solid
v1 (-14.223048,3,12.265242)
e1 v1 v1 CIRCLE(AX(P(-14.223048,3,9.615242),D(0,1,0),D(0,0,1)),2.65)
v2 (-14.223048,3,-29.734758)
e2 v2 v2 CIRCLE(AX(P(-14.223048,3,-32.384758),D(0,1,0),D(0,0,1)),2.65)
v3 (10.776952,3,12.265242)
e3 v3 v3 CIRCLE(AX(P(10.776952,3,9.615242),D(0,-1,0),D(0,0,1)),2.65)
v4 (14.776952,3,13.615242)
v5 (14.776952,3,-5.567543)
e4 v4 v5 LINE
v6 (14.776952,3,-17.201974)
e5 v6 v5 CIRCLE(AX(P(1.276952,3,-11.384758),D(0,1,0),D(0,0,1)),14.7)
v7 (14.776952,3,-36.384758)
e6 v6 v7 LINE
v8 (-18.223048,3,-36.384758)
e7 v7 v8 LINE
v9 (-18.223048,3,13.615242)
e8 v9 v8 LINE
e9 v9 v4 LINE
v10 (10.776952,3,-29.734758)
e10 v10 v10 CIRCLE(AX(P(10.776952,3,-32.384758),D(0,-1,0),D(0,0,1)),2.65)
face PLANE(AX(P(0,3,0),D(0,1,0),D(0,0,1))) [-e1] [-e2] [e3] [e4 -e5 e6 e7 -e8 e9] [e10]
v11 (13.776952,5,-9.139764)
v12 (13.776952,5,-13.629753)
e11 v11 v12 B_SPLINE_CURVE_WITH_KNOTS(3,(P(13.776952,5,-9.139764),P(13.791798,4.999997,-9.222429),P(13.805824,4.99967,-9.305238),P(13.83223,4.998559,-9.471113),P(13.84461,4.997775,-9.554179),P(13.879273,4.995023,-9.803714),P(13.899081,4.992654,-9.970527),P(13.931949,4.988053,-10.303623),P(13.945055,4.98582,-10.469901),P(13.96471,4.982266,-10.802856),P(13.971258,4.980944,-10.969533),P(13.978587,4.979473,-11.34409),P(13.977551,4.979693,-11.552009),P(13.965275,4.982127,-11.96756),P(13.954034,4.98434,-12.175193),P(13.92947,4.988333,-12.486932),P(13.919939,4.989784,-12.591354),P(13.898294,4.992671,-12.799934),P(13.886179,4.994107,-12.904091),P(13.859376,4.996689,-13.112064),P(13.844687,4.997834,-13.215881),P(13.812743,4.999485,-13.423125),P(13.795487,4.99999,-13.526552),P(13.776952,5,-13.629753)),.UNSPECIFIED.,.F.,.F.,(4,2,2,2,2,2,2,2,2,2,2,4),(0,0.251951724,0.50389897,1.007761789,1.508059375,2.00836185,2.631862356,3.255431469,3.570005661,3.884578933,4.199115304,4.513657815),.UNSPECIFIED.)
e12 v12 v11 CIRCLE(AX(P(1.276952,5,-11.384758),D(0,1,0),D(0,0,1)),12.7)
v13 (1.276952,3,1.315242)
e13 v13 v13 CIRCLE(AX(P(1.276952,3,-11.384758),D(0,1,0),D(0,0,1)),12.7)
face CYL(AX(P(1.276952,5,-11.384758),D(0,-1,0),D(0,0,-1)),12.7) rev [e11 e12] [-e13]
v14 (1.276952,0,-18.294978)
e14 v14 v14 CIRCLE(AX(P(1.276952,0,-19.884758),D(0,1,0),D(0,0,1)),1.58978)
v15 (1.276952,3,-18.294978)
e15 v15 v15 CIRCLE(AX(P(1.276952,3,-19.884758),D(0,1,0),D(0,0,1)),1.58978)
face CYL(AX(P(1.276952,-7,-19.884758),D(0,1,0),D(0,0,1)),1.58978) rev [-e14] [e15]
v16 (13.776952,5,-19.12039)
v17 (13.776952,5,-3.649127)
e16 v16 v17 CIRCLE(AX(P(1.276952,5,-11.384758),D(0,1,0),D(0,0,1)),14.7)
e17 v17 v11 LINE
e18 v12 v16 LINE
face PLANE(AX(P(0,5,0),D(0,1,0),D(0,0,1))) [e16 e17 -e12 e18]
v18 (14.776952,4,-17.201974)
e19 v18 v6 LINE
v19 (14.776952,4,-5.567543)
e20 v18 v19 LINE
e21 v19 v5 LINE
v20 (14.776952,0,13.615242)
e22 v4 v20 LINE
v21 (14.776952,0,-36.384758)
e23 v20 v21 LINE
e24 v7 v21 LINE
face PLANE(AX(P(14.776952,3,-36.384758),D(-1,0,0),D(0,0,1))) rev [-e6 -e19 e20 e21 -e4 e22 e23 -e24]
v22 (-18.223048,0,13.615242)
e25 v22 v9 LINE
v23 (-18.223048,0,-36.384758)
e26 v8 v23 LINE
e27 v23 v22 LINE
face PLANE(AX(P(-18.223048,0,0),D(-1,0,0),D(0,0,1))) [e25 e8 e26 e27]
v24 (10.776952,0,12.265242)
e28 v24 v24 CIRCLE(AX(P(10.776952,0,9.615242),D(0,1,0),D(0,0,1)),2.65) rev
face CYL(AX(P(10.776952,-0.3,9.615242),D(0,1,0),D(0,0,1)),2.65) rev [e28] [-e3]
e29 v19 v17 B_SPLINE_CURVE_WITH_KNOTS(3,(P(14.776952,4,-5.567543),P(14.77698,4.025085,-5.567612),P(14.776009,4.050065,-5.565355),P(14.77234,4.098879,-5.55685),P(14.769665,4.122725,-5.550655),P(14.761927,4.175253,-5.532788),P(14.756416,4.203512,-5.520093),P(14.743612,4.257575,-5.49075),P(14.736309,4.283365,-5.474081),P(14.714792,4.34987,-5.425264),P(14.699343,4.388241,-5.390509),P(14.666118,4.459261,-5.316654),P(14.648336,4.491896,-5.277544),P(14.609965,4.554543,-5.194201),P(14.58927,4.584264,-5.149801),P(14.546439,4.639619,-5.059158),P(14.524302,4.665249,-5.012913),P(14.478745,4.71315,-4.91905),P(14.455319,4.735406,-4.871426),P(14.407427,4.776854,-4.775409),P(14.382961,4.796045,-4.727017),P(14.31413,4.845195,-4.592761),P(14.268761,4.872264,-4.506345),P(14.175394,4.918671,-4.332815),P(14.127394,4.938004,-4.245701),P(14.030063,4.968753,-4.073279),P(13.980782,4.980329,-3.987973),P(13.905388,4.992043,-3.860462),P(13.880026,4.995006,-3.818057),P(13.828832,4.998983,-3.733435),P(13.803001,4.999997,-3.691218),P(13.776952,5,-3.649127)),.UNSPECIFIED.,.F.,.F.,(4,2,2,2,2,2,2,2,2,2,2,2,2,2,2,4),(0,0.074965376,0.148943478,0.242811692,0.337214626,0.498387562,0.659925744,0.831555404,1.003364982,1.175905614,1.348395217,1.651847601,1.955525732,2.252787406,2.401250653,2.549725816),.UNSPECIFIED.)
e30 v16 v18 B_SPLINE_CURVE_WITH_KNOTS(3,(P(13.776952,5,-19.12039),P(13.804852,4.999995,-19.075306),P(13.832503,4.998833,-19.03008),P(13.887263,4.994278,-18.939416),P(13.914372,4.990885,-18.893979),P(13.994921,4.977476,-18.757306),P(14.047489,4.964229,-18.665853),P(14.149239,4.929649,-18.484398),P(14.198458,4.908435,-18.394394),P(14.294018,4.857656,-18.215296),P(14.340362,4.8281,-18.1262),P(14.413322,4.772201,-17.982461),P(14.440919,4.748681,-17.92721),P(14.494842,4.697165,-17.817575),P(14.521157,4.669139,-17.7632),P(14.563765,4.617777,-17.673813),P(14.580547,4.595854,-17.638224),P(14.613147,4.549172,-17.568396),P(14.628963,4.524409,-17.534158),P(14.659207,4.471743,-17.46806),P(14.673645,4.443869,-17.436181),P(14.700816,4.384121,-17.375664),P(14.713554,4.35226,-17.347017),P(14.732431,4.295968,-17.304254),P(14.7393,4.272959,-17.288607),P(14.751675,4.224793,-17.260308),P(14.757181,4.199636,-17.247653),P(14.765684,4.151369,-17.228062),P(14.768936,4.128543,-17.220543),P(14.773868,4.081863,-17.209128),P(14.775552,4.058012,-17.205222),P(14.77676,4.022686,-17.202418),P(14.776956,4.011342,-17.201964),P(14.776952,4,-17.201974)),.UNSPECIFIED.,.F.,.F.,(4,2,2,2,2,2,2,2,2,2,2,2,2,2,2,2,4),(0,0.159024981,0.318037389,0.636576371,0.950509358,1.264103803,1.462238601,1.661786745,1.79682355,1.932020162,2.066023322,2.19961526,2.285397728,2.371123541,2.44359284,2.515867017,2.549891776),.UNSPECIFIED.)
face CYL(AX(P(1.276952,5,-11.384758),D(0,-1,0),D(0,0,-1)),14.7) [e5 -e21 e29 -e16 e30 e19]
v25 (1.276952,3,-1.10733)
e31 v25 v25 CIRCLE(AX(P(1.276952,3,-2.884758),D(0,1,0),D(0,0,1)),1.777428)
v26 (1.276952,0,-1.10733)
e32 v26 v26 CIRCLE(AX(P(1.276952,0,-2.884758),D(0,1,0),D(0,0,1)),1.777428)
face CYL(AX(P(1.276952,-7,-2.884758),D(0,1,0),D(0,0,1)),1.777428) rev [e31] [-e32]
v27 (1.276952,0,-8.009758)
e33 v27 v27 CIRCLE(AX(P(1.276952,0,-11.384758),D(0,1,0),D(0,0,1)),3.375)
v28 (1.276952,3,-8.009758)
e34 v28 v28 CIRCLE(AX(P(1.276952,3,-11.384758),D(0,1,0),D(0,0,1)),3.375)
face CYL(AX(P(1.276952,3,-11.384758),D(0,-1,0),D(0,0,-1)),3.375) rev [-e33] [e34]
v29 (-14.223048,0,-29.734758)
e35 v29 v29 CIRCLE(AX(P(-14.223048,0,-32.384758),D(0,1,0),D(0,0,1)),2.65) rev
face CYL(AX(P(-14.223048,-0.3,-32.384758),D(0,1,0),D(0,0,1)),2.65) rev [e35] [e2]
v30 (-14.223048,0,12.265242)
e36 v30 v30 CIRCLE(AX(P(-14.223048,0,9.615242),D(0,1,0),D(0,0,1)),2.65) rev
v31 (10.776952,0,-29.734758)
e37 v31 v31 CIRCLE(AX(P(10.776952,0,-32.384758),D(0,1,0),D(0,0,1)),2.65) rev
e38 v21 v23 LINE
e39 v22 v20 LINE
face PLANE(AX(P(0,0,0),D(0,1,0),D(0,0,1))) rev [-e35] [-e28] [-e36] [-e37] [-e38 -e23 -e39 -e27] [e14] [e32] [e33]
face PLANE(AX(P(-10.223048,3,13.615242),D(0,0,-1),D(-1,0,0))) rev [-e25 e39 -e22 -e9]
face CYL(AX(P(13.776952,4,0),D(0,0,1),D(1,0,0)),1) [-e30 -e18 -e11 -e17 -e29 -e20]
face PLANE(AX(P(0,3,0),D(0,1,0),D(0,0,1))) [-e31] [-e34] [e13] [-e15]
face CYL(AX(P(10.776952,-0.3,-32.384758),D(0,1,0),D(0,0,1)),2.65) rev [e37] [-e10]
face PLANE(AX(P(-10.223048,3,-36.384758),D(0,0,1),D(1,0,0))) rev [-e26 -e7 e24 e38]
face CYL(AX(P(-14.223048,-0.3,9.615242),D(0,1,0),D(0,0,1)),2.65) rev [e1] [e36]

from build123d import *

# Parameters (mm, degrees)
SKETCH1_W           = 25
SKETCH1_H           = 50
SKETCH1_R           = 3.375
BOSS_EXTRUDE1_DEPTH = 3
SKETCH2_W           = 50
SKETCH2_H           = 3
BOSS_EXTRUDE2_DEPTH = 8
SKETCH3_W           = 8
SKETCH3_H           = 50
BOSS_EXTRUDE3_DEPTH = 42
SKETCH4_R           = 2.65
CUT_EXTRUDE1_DEPTH  = 3.3
SKETCH5_R           = 5.802370205
CUT_EXTRUDE2_DEPTH  = 9
FILLET2_R           = 1
SKETCH6_R           = 12.7
BOSS_EXTRUDE4_DEPTH = 2
FILLET4_R           = 1
SKETCH8_R           = 1.589780168
SKETCH8_R_2         = 1.777428262
CUT_EXTRUDE3_DEPTH  = 10
SKETCH9_W           = 8
SKETCH9_H           = 42
CUT_EXTRUDE4_DEPTH  = 68.79439129


with BuildPart() as part:
    # Sketch1 → Boss-Extrude1 (new body)
    with BuildSketch(Plane(origin=(0, 0, 0), x_dir=(1, 0, 0), z_dir=(0, 1, 0))):
        with Locations((2.276951673, 11.384758364)):
            Rectangle(SKETCH1_W, SKETCH1_H)
        with Locations(Location((1.276951673, 11.384758364, 0), (0, 0, 270))):
            Circle(SKETCH1_R, mode=Mode.SUBTRACT)
    extrude(amount=BOSS_EXTRUDE1_DEPTH)

    # Sketch2 → Boss-Extrude2 (add)
    with BuildSketch(Plane.ZY.offset(10.223048327)):
        with Locations((-11.384758364, 1.5)):
            Rectangle(SKETCH2_W, SKETCH2_H)
    extrude(amount=BOSS_EXTRUDE2_DEPTH)

    # Sketch3 → Boss-Extrude3 (add)
    with BuildSketch(Plane.XZ):
        with Locations((-14.223048327, -11.384758364)):
            Rectangle(SKETCH3_W, SKETCH3_H)
    extrude(amount=BOSS_EXTRUDE3_DEPTH)

    # Sketch4 → Cut-Extrude1 (cut)
    with BuildSketch(Plane(origin=(0, 3, 0), x_dir=(1, 0, 0), z_dir=(0, 1, 0))):
        with Locations(Location((-14.223048327, 32.384758364, 0), (0, 0, 270))):
            Circle(SKETCH4_R)
        with Locations(Location((-14.223048327, -9.615241636, 0), (0, 0, 270))):
            Circle(SKETCH4_R)
    cut_extrude1 = extrude(amount=-CUT_EXTRUDE1_DEPTH, mode=Mode.SUBTRACT)

    # Mirror1: Cut-Extrude1 across plane
    add(cut_extrude1.mirror(Plane.ZX.offset(-19.5)), mode=Mode.SUBTRACT)

    # Sketch5 → Cut-Extrude2 (cut)
    with BuildSketch(Plane.ZY.offset(18.223048327)):
        with Locations((-11.836279124, -21)):
            Circle(SKETCH5_R)
    extrude(amount=-CUT_EXTRUDE2_DEPTH, mode=Mode.SUBTRACT)

    # Fillet2
    fillet2_edges = [part.edges().sort_by_distance(p)[0] for p in [
        (-10.223048327, -21, -17.638649329),
    ]]
    fillet(fillet2_edges, radius=FILLET2_R)

    # Mirror2: Cut-Extrude1 across plane
    add(cut_extrude1.mirror(Plane.ZY.offset(1.723048327)), mode=Mode.SUBTRACT)

    # Sketch6 → Boss-Extrude4 (add)
    with BuildSketch(Plane(origin=(0, 3, 0), x_dir=(1, 0, 0), z_dir=(0, 1, 0))):
        with BuildLine():
            Line((14.776951673, 5.567542535), (14.776951673, 17.201974193))
            ThreePointArc((14.776951673, 17.201974193), (-13.423048327, 11.384758364), (14.776951673, 5.567542535))
        make_face()
        with Locations(Location((1.276951673, 11.384758364, 0), (0, 0, 270))):
            Circle(SKETCH6_R, mode=Mode.SUBTRACT)
    extrude(amount=BOSS_EXTRUDE4_DEPTH)

    # Fillet4
    # the kernel refuses this fillet: 1 mm, written as the material it takes off along each edge
    with BuildSketch(Plane(origin=(14.776951673, 5, -3.067542535), x_dir=(0, -1, 0), z_dir=(0, 0, -1))) as fillet4_piece_1:
        with BuildLine():
            CenterArc((FILLET4_R, FILLET4_R), FILLET4_R, 180, 90)
            Line((0, FILLET4_R), (0, 0))
            Line((0, 0), (FILLET4_R, 0))
        make_face()
    extrude(amount=16.634431658, mode=Mode.SUBTRACT)

    # Sketch8 → Cut-Extrude3 (cut)
    with BuildSketch(Plane(origin=(0, 3, 0), x_dir=(1, 0, 0), z_dir=(0, 1, 0))):
        with Locations(Location((1.276951673, 19.884758364, 0), (0, 0, 270))):
            Circle(SKETCH8_R)
        with Locations(Location((1.276951673, 2.884758364, 0), (0, 0, 270))):
            Circle(SKETCH8_R_2)
    extrude(amount=-CUT_EXTRUDE3_DEPTH, mode=Mode.SUBTRACT)

    # Sketch9 → Cut-Extrude4 (cut, through all)
    with BuildSketch(Plane.XY.offset(13.615241636)):
        with Locations((-14.223048327, -21)):
            Rectangle(SKETCH9_W, SKETCH9_H)
    extrude(amount=-CUT_EXTRUDE4_DEPTH, mode=Mode.SUBTRACT)


solid = part.part
